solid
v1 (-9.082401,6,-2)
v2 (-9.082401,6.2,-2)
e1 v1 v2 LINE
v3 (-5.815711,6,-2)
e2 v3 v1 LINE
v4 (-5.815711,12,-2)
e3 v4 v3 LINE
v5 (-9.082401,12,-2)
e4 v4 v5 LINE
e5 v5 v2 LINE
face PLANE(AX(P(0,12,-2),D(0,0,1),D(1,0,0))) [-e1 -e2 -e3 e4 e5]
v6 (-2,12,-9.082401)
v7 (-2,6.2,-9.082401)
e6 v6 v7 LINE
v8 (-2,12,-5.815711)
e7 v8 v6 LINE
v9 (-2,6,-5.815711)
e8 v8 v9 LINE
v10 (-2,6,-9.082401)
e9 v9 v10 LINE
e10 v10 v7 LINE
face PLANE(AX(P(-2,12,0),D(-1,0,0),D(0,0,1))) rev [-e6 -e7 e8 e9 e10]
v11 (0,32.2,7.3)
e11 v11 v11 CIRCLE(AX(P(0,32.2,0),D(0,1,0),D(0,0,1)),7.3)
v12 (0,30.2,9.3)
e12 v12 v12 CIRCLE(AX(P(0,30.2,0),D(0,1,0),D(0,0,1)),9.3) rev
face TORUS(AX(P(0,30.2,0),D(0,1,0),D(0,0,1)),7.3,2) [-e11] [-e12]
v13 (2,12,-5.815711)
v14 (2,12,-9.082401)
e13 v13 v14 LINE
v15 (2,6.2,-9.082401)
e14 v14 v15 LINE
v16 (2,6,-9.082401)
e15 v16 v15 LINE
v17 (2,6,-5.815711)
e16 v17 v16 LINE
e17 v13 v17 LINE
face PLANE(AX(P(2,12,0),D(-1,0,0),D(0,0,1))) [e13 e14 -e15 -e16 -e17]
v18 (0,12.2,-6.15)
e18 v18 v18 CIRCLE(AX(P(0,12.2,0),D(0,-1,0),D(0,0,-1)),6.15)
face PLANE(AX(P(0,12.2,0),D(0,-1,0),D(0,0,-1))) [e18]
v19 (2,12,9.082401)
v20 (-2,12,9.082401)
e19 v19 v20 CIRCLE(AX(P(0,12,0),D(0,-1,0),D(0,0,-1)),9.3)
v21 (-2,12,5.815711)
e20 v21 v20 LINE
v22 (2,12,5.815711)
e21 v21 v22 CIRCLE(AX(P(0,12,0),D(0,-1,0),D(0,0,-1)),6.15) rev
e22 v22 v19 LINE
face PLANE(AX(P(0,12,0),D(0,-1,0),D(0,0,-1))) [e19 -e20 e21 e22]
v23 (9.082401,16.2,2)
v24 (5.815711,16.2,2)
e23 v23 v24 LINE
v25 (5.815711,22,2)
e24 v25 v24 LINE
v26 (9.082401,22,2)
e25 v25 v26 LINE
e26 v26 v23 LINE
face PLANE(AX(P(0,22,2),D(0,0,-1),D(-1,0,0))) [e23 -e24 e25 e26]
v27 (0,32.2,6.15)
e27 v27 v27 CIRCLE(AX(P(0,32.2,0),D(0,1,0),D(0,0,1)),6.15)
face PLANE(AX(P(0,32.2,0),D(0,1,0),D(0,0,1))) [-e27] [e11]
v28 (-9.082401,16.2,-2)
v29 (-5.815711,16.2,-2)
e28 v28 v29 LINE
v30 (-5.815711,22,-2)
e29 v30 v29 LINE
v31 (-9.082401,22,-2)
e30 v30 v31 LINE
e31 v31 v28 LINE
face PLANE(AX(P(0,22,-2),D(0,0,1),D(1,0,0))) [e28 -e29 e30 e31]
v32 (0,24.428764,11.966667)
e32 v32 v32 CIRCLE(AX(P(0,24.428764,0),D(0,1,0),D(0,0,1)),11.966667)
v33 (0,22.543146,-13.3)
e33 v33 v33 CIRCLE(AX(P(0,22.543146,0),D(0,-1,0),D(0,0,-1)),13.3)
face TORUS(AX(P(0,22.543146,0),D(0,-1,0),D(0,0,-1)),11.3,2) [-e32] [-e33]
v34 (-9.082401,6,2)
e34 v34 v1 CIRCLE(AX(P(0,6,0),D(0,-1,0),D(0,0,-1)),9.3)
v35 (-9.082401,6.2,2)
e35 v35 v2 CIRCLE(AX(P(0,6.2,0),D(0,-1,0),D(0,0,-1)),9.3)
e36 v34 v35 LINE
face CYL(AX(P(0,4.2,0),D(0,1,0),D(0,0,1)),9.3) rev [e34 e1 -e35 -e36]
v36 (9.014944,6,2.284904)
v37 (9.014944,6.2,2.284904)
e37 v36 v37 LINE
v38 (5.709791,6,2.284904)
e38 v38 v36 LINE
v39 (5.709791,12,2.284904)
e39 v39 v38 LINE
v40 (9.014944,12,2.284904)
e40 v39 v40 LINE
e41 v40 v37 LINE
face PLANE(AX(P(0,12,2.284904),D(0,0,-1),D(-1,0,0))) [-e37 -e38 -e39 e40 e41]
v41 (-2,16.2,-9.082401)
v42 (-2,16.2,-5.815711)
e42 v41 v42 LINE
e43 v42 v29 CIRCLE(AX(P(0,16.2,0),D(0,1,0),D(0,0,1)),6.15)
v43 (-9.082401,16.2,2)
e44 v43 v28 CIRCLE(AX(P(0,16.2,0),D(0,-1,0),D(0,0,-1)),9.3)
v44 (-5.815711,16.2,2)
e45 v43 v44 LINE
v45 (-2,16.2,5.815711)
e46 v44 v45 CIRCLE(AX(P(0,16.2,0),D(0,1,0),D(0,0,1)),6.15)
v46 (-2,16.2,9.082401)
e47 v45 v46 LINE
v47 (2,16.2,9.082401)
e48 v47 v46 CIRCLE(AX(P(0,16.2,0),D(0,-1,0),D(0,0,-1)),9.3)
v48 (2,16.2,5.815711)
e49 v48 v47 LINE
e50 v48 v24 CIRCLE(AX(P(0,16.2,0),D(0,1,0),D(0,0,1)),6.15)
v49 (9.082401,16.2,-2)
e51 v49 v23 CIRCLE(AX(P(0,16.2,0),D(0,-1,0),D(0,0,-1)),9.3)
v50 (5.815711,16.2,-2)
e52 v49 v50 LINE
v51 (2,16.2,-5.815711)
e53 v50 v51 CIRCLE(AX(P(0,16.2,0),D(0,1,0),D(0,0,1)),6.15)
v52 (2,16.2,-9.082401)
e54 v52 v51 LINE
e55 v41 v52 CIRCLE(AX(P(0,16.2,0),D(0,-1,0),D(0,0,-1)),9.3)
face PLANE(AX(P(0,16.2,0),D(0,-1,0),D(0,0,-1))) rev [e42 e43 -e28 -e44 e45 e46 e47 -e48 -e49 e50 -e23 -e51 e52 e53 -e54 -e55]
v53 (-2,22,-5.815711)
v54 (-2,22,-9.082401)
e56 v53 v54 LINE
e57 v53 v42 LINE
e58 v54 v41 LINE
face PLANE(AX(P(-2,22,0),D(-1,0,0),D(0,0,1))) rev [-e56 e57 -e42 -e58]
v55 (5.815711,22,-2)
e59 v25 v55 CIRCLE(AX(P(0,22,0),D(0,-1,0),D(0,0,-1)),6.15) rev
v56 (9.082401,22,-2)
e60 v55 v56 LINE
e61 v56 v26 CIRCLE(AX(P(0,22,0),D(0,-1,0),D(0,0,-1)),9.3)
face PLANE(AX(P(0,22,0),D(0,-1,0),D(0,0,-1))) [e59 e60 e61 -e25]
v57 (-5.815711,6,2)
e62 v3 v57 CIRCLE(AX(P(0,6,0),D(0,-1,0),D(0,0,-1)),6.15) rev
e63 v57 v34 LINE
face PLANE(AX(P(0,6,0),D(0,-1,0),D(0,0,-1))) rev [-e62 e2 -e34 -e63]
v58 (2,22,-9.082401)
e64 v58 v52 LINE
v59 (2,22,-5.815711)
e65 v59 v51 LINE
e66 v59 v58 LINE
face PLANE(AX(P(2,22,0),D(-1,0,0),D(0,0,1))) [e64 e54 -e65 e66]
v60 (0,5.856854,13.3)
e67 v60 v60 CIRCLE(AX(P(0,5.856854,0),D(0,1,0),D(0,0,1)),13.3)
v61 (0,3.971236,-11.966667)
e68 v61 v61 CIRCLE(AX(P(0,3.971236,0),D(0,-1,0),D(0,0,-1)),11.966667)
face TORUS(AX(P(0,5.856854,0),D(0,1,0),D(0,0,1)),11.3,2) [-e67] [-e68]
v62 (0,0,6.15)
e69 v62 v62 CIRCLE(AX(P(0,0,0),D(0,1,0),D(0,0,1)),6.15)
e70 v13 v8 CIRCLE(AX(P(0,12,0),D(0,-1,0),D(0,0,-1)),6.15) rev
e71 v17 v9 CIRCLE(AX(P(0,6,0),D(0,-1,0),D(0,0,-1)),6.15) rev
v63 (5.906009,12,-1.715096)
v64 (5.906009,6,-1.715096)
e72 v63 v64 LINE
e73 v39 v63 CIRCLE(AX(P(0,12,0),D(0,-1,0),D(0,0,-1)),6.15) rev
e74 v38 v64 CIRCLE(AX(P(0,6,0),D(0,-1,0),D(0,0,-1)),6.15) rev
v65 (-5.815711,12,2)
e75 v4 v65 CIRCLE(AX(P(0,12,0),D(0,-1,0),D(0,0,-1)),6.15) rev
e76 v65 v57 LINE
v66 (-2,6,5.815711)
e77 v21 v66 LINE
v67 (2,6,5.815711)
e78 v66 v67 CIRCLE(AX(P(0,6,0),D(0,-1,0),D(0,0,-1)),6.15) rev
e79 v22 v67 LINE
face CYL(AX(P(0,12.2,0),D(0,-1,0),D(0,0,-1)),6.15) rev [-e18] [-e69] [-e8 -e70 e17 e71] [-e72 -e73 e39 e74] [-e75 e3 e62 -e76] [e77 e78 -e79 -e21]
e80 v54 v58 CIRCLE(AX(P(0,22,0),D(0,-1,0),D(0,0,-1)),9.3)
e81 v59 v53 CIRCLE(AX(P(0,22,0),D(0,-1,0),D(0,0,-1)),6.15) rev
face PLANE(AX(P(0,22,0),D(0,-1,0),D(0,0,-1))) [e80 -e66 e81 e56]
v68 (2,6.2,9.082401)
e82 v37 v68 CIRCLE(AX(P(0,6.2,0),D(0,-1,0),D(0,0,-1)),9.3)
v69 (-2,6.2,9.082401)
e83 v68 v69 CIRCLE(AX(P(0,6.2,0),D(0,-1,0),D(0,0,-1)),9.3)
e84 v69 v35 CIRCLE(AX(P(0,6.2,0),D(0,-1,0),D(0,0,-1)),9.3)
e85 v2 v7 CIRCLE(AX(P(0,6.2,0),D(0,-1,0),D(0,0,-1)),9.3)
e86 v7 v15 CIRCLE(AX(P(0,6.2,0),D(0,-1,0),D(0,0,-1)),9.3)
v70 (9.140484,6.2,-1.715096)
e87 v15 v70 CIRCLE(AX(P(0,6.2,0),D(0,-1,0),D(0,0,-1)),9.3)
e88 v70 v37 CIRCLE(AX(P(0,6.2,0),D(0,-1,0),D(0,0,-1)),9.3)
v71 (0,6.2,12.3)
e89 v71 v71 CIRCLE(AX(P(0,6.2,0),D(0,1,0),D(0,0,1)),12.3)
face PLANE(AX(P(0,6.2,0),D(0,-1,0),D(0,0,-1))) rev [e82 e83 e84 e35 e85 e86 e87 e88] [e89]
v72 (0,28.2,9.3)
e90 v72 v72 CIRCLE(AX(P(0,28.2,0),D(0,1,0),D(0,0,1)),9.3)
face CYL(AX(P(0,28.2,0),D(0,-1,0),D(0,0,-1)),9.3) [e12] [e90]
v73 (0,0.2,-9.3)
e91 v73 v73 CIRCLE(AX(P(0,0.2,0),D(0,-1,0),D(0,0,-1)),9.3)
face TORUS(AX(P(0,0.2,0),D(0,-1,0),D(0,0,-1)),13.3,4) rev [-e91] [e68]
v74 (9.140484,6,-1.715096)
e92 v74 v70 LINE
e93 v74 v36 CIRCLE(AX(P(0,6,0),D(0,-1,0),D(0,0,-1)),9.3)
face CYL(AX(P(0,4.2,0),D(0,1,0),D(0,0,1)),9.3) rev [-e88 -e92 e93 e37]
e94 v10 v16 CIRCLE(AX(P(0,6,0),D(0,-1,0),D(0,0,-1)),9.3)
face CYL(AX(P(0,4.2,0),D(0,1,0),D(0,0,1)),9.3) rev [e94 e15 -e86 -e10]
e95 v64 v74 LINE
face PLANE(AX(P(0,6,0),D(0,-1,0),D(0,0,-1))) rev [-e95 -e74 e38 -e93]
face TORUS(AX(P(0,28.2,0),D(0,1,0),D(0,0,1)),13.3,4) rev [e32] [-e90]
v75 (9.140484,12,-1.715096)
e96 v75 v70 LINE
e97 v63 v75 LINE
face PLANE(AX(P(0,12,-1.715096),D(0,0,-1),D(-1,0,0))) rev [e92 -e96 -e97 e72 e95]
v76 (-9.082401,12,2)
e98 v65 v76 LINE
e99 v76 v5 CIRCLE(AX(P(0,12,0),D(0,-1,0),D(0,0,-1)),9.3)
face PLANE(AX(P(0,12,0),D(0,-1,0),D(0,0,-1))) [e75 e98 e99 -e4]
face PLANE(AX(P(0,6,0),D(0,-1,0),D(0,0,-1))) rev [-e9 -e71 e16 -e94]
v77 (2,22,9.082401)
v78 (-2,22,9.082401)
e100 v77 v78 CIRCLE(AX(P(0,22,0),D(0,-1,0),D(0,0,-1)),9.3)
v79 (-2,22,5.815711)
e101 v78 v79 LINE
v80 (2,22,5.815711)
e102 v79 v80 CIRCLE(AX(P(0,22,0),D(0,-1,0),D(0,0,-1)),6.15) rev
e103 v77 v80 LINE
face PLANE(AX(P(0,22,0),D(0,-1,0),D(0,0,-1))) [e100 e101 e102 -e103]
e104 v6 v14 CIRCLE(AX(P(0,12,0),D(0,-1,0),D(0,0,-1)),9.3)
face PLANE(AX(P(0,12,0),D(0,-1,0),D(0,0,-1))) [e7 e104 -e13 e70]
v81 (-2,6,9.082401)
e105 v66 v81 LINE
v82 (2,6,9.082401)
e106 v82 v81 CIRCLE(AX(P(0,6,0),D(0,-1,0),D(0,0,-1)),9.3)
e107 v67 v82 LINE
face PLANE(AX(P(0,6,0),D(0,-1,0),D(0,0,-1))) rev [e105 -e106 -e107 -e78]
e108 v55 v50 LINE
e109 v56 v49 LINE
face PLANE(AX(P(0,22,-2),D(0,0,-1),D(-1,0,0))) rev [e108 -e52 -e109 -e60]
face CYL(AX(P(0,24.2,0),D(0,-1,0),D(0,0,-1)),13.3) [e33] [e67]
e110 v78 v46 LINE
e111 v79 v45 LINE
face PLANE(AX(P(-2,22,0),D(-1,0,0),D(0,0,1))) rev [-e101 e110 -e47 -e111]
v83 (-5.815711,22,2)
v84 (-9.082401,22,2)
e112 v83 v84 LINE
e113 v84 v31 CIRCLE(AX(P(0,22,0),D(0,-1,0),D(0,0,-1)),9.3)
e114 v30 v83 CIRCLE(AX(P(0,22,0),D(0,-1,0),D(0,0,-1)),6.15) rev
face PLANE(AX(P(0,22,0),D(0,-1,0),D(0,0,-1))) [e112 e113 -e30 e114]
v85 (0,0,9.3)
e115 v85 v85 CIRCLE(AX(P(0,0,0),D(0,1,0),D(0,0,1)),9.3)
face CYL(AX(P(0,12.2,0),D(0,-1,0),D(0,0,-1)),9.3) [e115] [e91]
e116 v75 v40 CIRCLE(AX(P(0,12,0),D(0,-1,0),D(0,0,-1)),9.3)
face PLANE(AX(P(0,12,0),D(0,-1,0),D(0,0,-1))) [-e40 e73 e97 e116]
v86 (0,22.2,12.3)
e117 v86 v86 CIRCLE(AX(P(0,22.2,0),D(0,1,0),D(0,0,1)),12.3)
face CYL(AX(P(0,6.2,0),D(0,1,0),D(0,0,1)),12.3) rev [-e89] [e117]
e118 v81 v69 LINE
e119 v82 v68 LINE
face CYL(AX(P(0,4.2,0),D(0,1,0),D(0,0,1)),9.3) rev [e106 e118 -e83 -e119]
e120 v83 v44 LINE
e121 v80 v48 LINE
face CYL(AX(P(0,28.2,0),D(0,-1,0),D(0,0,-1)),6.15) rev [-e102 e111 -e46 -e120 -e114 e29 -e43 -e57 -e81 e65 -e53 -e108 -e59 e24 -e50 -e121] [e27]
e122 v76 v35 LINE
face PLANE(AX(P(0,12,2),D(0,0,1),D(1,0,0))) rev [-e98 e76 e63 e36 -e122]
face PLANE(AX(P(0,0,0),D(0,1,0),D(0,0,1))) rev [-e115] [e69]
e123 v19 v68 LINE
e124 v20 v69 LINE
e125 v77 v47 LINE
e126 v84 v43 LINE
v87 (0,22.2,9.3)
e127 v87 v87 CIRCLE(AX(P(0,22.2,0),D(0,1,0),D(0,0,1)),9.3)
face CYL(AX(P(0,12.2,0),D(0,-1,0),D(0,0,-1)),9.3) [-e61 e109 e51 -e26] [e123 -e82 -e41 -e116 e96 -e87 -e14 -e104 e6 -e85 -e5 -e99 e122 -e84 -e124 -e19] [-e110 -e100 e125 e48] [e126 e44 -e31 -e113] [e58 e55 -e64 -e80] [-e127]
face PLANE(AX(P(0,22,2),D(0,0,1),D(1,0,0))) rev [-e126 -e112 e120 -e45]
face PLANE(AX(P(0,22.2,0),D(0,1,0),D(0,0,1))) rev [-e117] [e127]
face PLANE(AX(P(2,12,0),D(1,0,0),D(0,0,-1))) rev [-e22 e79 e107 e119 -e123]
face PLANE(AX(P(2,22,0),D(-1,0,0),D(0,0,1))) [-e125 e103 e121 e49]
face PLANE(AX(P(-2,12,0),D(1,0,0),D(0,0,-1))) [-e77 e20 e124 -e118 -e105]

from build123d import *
from build123d.topology import SkipClean

# Parameters (mm, degrees)
SKETCH1_R                = 9.3
SKETCH1_R_2              = 6.15
BOSS_EXTRUDE1_DEPTH      = 12.2
BOSS_EXTRUDE2_START      = 4
SKETCH2_R                = 9.3
SKETCH2_R_2              = 6.15
BOSS_EXTRUDE2_DEPTH      = 12
BOSS_EXTRUDE3_DEPTH      = 10
BOSS_EXTRUDE3_DEPTH_BACK = 6
SKETCH3_R                = 13.3
SKETCH3_R_2              = 12.3
SKETCH4_R                = 13.3
SKETCH4_R_2              = 9.3
BOSS_EXTRUDE4_DEPTH      = 2
CUT_EXTRUDE1_START       = -6
CUT_EXTRUDE1_DEPTH       = 6
CUT_EXTRUDE2_START       = -16
CUT_EXTRUDE2_DEPTH       = 6
BOSS_EXTRUDE5_START      = 4
SKETCH7_R                = 9.3
BOSS_EXTRUDE5_DEPTH      = 4
BOSS_EXTRUDE6_START      = 2
SKETCH8_R                = 13.3
SKETCH8_R_2              = 9.3
BOSS_EXTRUDE6_DEPTH      = 2
SKETCH9_R                = 9.3
SKETCH9_R_2              = 6.15
BOSS_EXTRUDE7_DEPTH      = 4
FILLET1_R                = 4
FILLET2_R                = 4
FILLET3_R                = 2
FILLET4_R                = 2
FILLET5_R                = 2


# Some blends are built 0.0001 mm under size
with BuildPart() as part:
    # Sketch1 → Boss-Extrude1 (new body)
    with BuildSketch(Plane(origin=(0, 0, 0), x_dir=(1, 0, 0), z_dir=(0, 1, 0))):
        with Locations(Location((0, 0, 0), (0, 0, 270))):
            Circle(SKETCH1_R)
        with Locations(Location((0, 0, 0), (0, 0, 270))):
            Circle(SKETCH1_R_2, mode=Mode.SUBTRACT)
    extrude(amount=BOSS_EXTRUDE1_DEPTH)

    # Sketch5 → Cut-Extrude1 (cut)
    with BuildSketch(Plane.XZ.offset(CUT_EXTRUDE1_START)):
        with BuildLine():
            Line((9.01494402, 2.284903569), (5.709791212, 2.284903569))
            ThreePointArc((5.709791212, 2.284903569), (6.038945105, 1.163461226), (6.15, 0))
            ThreePointArc((6.15, 0), (6.088696755, -0.866182327), (5.906009163, -1.715096431))
            Line((5.906009163, -1.715096431), (9.140483807, -1.715096431))
            ThreePointArc((9.140483807, -1.715096431), (9.260035081, -0.861249265), (9.3, 0))
            ThreePointArc((9.3, 0), (9.228460852, 1.151308085), (9.01494402, 2.284903569))
        make_face()
        with BuildLine():
            ThreePointArc((2, -5.815711478), (0, -6.15), (-2, -5.815711478))
            Line((-2, -5.815711478), (-2, -9.082400564))
            ThreePointArc((-2, -9.082400564), (0, -9.3), (2, -9.082400564))
            Line((2, -9.082400564), (2, -5.815711478))
        make_face()
        with BuildLine():
            ThreePointArc((-5.815711478, -2), (-6.15, 0), (-5.815711478, 2))
            Line((-5.815711478, 2), (-9.082400564, 2))
            ThreePointArc((-9.082400564, 2), (-9.3, 0), (-9.082400564, -2))
            Line((-9.082400564, -2), (-5.815711478, -2))
        make_face()
        with BuildLine():
            ThreePointArc((-2, 5.815711478), (0, 6.15), (2, 5.815711478))
            Line((2, 5.815711478), (2, 9.082400564))
            ThreePointArc((2, 9.082400564), (0, 9.3), (-2, 9.082400564))
            Line((-2, 9.082400564), (-2, 5.815711478))
        make_face()
    extrude(amount=-CUT_EXTRUDE1_DEPTH, mode=Mode.SUBTRACT)



with BuildPart() as body_2:
    # Sketch2 → Boss-Extrude2 (new body)
    with BuildSketch(Plane(origin=(0, 12.2, 0), x_dir=(1, 0, 0), z_dir=(0, 1, 0)).offset(BOSS_EXTRUDE2_START)):
        with Locations(Location((0, 0, 0), (0, 0, 270))):
            Circle(SKETCH2_R)
        with Locations(Location((0, 0, 0), (0, 0, 270))):
            Circle(SKETCH2_R_2, mode=Mode.SUBTRACT)
    extrude(amount=BOSS_EXTRUDE2_DEPTH)



with BuildPart() as body_3:
    # Sketch3 → Boss-Extrude3 (new, two sides: drawn at the far end of the back side and taken through both)
    with BuildSketch(Plane(origin=(0, 12.2, 0), x_dir=(1, 0, 0), z_dir=(0, 1, 0)).offset(-BOSS_EXTRUDE3_DEPTH_BACK)):
        with Locations(Location((0, 0, 0), (0, 0, 270))):
            Circle(SKETCH3_R)
        with Locations(Location((0, 0, 0), (0, 0, 270))):
            Circle(SKETCH3_R_2, mode=Mode.SUBTRACT)
    extrude(amount=BOSS_EXTRUDE3_DEPTH + BOSS_EXTRUDE3_DEPTH_BACK)


with BuildPart() as body_2_1:
    add(body_2.part)

    add(body_3.part)  # Boss-Extrude4 merges body 3
    # Sketch4 → Boss-Extrude4 (add)
    with BuildSketch(Plane(origin=(0, 22.2, 0), x_dir=(1, 0, 0), z_dir=(0, 1, 0))):
        with Locations(Location((0, 0, 0), (0, 0, 270))):
            Circle(SKETCH4_R)
        with Locations(Location((0, 0, 0), (0, 0, 270))):
            Circle(SKETCH4_R_2, mode=Mode.SUBTRACT)
    extrude(amount=BOSS_EXTRUDE4_DEPTH)

    # Sketch6 → Cut-Extrude2 (cut)
    with BuildSketch(Plane.XZ.offset(CUT_EXTRUDE2_START)):
        with BuildLine():
            ThreePointArc((2, -5.815711478), (0, -6.15), (-2, -5.815711478))
            Line((-2, -5.815711478), (-2, -9.082400564))
            ThreePointArc((-2, -9.082400564), (0, -9.3), (2, -9.082400564))
            Line((2, -9.082400564), (2, -5.815711478))
        make_face()
        with BuildLine():
            Line((-9.082400564, -2), (-5.815711478, -2))
            ThreePointArc((-5.815711478, -2), (-6.15, 0), (-5.815711478, 2))
            Line((-5.815711478, 2), (-9.082400564, 2))
            ThreePointArc((-9.082400564, 2), (-9.3, 0), (-9.082400564, -2))
        make_face()
        with BuildLine():
            Line((-2, 9.082400564), (-2, 5.815711478))
            ThreePointArc((-2, 5.815711478), (0, 6.15), (2, 5.815711478))
            Line((2, 5.815711478), (2, 9.082400564))
            ThreePointArc((2, 9.082400564), (0, 9.3), (-2, 9.082400564))
        make_face()
        with BuildLine():
            Line((9.082400564, 2), (5.815711478, 2))
            ThreePointArc((5.815711478, 2), (6.06585219, 1.01387238), (6.15, 0))
            ThreePointArc((6.15, 0), (6.06585219, -1.01387238), (5.815711478, -2))
            Line((5.815711478, -2), (9.082400564, -2))
            ThreePointArc((9.082400564, -2), (9.245440099, -1.005901277), (9.3, 0))
            ThreePointArc((9.3, 0), (9.245440099, 1.005901277), (9.082400564, 2))
        make_face()
    extrude(amount=-CUT_EXTRUDE2_DEPTH, mode=Mode.SUBTRACT)


with BuildPart() as part_1:
    add(part.part)

    add(body_2_1.part)  # Boss-Extrude5 merges body 2
    # Sketch7 → Boss-Extrude5 (add)
    with BuildSketch(Plane.XZ.offset(-16.2).offset(BOSS_EXTRUDE5_START)):
        with Locations(Location((0, 0, 0), (0, 0, 90))):
            Circle(SKETCH7_R)
    extrude(amount=-BOSS_EXTRUDE5_DEPTH)

    # Sketch8 → Boss-Extrude6 (add)
    with BuildSketch(Plane.XZ.offset(-6.2).offset(BOSS_EXTRUDE6_START)):
        with Locations(Location((0, 0, 0), (0, 0, 270))):
            Circle(SKETCH8_R)
        with Locations(Location((0, 0, 0), (0, 0, 282.418681506))):
            Circle(SKETCH8_R_2, mode=Mode.SUBTRACT)
    extrude(amount=-BOSS_EXTRUDE6_DEPTH)

    # Sketch9 → Boss-Extrude7 (add)
    with SkipClean():  # the faces are left unmerged after this step: merging them gives an invalid solid
        with BuildSketch(Plane(origin=(0, 28.2, 0), x_dir=(1, 0, 0), z_dir=(0, 1, 0))):
            with Locations(Location((0, 0, 0), (0, 0, 77.581318494))):
                Circle(SKETCH9_R)
            with Locations(Location((0, 0, 0), (0, 0, 90))):
                Circle(SKETCH9_R_2, mode=Mode.SUBTRACT)
        extrude(amount=BOSS_EXTRUDE7_DEPTH)

    # Fillet1
    fillet1_edges = [part_1.edges().sort_by_distance(p)[0] for p in [
        (0, 4.2, -9.3),
    ]]
    fillet(fillet1_edges, radius=FILLET1_R - 0.0001)  # a hair under: the kernel refuses the full size

    # Fillet2
    fillet2_edges = [part_1.edges().sort_by_distance(p)[0] for p in [
        (0, 24.2, -9.3),
    ]]
    fillet(fillet2_edges, radius=FILLET2_R - 0.0001)  # a hair under: the kernel refuses the full size

    # Fillet3
    fillet3_edges = [part_1.edges().sort_by_distance(p)[0] for p in [
        (-2, 32.2, 9.082400564),
    ]]
    fillet(fillet3_edges, radius=FILLET3_R)

    # Fillet4
    # the kernel refuses this fillet: 2 mm, written as the material it takes off along each edge
    with BuildSketch(Plane(origin=(0, 24.2, 0), x_dir=(0, 0, 1), z_dir=(-1, 0, 0))) as fillet4_piece_1:
        with BuildLine():
            CenterArc((11.3, -1.656883538), FILLET4_R, 0, 70.529454613)
            Line((13.3, -1.656883538), (13.5, -1.656883538))
            Line((13.5, -1.656883538), (13.5, 0))
            Line((13.5, 0), (13.3, 0.2))
            ThreePointArc((13.3, 0.2), (13.2999, 0.2), (12.033308888, 0.417304996))
            Line((12.033308888, 0.417304996), (11.966644444, 0.228742402))
        make_face()
    revolve(axis=Axis((0, 24.2, 0), (0, 1, 0)), mode=Mode.SUBTRACT)

    # Fillet5
    # the kernel refuses this fillet: 2 mm, written as the material it takes off along each edge
    with BuildSketch(Plane(origin=(0, 4.2, 0), x_dir=(0, 0, -1), z_dir=(-1, 0, 0))) as fillet5_piece_1:
        with BuildLine():
            CenterArc((11.3, -1.656883538), FILLET5_R, 0, 70.529454613)
            Line((11.966644444, 0.228742402), (12.033308888, 0.417304996))
            ThreePointArc((12.033308888, 0.417304996), (13.2999, 0.2), (13.3, 0.2))
            Line((13.3, 0.2), (13.5, 0))
            Line((13.5, 0), (13.5, -1.656883538))
            Line((13.5, -1.656883538), (13.3, -1.656883538))
        make_face()
    revolve(axis=Axis((0, 4.2, 0), (0, -1, 0)), mode=Mode.SUBTRACT)


solid = part_1.part
